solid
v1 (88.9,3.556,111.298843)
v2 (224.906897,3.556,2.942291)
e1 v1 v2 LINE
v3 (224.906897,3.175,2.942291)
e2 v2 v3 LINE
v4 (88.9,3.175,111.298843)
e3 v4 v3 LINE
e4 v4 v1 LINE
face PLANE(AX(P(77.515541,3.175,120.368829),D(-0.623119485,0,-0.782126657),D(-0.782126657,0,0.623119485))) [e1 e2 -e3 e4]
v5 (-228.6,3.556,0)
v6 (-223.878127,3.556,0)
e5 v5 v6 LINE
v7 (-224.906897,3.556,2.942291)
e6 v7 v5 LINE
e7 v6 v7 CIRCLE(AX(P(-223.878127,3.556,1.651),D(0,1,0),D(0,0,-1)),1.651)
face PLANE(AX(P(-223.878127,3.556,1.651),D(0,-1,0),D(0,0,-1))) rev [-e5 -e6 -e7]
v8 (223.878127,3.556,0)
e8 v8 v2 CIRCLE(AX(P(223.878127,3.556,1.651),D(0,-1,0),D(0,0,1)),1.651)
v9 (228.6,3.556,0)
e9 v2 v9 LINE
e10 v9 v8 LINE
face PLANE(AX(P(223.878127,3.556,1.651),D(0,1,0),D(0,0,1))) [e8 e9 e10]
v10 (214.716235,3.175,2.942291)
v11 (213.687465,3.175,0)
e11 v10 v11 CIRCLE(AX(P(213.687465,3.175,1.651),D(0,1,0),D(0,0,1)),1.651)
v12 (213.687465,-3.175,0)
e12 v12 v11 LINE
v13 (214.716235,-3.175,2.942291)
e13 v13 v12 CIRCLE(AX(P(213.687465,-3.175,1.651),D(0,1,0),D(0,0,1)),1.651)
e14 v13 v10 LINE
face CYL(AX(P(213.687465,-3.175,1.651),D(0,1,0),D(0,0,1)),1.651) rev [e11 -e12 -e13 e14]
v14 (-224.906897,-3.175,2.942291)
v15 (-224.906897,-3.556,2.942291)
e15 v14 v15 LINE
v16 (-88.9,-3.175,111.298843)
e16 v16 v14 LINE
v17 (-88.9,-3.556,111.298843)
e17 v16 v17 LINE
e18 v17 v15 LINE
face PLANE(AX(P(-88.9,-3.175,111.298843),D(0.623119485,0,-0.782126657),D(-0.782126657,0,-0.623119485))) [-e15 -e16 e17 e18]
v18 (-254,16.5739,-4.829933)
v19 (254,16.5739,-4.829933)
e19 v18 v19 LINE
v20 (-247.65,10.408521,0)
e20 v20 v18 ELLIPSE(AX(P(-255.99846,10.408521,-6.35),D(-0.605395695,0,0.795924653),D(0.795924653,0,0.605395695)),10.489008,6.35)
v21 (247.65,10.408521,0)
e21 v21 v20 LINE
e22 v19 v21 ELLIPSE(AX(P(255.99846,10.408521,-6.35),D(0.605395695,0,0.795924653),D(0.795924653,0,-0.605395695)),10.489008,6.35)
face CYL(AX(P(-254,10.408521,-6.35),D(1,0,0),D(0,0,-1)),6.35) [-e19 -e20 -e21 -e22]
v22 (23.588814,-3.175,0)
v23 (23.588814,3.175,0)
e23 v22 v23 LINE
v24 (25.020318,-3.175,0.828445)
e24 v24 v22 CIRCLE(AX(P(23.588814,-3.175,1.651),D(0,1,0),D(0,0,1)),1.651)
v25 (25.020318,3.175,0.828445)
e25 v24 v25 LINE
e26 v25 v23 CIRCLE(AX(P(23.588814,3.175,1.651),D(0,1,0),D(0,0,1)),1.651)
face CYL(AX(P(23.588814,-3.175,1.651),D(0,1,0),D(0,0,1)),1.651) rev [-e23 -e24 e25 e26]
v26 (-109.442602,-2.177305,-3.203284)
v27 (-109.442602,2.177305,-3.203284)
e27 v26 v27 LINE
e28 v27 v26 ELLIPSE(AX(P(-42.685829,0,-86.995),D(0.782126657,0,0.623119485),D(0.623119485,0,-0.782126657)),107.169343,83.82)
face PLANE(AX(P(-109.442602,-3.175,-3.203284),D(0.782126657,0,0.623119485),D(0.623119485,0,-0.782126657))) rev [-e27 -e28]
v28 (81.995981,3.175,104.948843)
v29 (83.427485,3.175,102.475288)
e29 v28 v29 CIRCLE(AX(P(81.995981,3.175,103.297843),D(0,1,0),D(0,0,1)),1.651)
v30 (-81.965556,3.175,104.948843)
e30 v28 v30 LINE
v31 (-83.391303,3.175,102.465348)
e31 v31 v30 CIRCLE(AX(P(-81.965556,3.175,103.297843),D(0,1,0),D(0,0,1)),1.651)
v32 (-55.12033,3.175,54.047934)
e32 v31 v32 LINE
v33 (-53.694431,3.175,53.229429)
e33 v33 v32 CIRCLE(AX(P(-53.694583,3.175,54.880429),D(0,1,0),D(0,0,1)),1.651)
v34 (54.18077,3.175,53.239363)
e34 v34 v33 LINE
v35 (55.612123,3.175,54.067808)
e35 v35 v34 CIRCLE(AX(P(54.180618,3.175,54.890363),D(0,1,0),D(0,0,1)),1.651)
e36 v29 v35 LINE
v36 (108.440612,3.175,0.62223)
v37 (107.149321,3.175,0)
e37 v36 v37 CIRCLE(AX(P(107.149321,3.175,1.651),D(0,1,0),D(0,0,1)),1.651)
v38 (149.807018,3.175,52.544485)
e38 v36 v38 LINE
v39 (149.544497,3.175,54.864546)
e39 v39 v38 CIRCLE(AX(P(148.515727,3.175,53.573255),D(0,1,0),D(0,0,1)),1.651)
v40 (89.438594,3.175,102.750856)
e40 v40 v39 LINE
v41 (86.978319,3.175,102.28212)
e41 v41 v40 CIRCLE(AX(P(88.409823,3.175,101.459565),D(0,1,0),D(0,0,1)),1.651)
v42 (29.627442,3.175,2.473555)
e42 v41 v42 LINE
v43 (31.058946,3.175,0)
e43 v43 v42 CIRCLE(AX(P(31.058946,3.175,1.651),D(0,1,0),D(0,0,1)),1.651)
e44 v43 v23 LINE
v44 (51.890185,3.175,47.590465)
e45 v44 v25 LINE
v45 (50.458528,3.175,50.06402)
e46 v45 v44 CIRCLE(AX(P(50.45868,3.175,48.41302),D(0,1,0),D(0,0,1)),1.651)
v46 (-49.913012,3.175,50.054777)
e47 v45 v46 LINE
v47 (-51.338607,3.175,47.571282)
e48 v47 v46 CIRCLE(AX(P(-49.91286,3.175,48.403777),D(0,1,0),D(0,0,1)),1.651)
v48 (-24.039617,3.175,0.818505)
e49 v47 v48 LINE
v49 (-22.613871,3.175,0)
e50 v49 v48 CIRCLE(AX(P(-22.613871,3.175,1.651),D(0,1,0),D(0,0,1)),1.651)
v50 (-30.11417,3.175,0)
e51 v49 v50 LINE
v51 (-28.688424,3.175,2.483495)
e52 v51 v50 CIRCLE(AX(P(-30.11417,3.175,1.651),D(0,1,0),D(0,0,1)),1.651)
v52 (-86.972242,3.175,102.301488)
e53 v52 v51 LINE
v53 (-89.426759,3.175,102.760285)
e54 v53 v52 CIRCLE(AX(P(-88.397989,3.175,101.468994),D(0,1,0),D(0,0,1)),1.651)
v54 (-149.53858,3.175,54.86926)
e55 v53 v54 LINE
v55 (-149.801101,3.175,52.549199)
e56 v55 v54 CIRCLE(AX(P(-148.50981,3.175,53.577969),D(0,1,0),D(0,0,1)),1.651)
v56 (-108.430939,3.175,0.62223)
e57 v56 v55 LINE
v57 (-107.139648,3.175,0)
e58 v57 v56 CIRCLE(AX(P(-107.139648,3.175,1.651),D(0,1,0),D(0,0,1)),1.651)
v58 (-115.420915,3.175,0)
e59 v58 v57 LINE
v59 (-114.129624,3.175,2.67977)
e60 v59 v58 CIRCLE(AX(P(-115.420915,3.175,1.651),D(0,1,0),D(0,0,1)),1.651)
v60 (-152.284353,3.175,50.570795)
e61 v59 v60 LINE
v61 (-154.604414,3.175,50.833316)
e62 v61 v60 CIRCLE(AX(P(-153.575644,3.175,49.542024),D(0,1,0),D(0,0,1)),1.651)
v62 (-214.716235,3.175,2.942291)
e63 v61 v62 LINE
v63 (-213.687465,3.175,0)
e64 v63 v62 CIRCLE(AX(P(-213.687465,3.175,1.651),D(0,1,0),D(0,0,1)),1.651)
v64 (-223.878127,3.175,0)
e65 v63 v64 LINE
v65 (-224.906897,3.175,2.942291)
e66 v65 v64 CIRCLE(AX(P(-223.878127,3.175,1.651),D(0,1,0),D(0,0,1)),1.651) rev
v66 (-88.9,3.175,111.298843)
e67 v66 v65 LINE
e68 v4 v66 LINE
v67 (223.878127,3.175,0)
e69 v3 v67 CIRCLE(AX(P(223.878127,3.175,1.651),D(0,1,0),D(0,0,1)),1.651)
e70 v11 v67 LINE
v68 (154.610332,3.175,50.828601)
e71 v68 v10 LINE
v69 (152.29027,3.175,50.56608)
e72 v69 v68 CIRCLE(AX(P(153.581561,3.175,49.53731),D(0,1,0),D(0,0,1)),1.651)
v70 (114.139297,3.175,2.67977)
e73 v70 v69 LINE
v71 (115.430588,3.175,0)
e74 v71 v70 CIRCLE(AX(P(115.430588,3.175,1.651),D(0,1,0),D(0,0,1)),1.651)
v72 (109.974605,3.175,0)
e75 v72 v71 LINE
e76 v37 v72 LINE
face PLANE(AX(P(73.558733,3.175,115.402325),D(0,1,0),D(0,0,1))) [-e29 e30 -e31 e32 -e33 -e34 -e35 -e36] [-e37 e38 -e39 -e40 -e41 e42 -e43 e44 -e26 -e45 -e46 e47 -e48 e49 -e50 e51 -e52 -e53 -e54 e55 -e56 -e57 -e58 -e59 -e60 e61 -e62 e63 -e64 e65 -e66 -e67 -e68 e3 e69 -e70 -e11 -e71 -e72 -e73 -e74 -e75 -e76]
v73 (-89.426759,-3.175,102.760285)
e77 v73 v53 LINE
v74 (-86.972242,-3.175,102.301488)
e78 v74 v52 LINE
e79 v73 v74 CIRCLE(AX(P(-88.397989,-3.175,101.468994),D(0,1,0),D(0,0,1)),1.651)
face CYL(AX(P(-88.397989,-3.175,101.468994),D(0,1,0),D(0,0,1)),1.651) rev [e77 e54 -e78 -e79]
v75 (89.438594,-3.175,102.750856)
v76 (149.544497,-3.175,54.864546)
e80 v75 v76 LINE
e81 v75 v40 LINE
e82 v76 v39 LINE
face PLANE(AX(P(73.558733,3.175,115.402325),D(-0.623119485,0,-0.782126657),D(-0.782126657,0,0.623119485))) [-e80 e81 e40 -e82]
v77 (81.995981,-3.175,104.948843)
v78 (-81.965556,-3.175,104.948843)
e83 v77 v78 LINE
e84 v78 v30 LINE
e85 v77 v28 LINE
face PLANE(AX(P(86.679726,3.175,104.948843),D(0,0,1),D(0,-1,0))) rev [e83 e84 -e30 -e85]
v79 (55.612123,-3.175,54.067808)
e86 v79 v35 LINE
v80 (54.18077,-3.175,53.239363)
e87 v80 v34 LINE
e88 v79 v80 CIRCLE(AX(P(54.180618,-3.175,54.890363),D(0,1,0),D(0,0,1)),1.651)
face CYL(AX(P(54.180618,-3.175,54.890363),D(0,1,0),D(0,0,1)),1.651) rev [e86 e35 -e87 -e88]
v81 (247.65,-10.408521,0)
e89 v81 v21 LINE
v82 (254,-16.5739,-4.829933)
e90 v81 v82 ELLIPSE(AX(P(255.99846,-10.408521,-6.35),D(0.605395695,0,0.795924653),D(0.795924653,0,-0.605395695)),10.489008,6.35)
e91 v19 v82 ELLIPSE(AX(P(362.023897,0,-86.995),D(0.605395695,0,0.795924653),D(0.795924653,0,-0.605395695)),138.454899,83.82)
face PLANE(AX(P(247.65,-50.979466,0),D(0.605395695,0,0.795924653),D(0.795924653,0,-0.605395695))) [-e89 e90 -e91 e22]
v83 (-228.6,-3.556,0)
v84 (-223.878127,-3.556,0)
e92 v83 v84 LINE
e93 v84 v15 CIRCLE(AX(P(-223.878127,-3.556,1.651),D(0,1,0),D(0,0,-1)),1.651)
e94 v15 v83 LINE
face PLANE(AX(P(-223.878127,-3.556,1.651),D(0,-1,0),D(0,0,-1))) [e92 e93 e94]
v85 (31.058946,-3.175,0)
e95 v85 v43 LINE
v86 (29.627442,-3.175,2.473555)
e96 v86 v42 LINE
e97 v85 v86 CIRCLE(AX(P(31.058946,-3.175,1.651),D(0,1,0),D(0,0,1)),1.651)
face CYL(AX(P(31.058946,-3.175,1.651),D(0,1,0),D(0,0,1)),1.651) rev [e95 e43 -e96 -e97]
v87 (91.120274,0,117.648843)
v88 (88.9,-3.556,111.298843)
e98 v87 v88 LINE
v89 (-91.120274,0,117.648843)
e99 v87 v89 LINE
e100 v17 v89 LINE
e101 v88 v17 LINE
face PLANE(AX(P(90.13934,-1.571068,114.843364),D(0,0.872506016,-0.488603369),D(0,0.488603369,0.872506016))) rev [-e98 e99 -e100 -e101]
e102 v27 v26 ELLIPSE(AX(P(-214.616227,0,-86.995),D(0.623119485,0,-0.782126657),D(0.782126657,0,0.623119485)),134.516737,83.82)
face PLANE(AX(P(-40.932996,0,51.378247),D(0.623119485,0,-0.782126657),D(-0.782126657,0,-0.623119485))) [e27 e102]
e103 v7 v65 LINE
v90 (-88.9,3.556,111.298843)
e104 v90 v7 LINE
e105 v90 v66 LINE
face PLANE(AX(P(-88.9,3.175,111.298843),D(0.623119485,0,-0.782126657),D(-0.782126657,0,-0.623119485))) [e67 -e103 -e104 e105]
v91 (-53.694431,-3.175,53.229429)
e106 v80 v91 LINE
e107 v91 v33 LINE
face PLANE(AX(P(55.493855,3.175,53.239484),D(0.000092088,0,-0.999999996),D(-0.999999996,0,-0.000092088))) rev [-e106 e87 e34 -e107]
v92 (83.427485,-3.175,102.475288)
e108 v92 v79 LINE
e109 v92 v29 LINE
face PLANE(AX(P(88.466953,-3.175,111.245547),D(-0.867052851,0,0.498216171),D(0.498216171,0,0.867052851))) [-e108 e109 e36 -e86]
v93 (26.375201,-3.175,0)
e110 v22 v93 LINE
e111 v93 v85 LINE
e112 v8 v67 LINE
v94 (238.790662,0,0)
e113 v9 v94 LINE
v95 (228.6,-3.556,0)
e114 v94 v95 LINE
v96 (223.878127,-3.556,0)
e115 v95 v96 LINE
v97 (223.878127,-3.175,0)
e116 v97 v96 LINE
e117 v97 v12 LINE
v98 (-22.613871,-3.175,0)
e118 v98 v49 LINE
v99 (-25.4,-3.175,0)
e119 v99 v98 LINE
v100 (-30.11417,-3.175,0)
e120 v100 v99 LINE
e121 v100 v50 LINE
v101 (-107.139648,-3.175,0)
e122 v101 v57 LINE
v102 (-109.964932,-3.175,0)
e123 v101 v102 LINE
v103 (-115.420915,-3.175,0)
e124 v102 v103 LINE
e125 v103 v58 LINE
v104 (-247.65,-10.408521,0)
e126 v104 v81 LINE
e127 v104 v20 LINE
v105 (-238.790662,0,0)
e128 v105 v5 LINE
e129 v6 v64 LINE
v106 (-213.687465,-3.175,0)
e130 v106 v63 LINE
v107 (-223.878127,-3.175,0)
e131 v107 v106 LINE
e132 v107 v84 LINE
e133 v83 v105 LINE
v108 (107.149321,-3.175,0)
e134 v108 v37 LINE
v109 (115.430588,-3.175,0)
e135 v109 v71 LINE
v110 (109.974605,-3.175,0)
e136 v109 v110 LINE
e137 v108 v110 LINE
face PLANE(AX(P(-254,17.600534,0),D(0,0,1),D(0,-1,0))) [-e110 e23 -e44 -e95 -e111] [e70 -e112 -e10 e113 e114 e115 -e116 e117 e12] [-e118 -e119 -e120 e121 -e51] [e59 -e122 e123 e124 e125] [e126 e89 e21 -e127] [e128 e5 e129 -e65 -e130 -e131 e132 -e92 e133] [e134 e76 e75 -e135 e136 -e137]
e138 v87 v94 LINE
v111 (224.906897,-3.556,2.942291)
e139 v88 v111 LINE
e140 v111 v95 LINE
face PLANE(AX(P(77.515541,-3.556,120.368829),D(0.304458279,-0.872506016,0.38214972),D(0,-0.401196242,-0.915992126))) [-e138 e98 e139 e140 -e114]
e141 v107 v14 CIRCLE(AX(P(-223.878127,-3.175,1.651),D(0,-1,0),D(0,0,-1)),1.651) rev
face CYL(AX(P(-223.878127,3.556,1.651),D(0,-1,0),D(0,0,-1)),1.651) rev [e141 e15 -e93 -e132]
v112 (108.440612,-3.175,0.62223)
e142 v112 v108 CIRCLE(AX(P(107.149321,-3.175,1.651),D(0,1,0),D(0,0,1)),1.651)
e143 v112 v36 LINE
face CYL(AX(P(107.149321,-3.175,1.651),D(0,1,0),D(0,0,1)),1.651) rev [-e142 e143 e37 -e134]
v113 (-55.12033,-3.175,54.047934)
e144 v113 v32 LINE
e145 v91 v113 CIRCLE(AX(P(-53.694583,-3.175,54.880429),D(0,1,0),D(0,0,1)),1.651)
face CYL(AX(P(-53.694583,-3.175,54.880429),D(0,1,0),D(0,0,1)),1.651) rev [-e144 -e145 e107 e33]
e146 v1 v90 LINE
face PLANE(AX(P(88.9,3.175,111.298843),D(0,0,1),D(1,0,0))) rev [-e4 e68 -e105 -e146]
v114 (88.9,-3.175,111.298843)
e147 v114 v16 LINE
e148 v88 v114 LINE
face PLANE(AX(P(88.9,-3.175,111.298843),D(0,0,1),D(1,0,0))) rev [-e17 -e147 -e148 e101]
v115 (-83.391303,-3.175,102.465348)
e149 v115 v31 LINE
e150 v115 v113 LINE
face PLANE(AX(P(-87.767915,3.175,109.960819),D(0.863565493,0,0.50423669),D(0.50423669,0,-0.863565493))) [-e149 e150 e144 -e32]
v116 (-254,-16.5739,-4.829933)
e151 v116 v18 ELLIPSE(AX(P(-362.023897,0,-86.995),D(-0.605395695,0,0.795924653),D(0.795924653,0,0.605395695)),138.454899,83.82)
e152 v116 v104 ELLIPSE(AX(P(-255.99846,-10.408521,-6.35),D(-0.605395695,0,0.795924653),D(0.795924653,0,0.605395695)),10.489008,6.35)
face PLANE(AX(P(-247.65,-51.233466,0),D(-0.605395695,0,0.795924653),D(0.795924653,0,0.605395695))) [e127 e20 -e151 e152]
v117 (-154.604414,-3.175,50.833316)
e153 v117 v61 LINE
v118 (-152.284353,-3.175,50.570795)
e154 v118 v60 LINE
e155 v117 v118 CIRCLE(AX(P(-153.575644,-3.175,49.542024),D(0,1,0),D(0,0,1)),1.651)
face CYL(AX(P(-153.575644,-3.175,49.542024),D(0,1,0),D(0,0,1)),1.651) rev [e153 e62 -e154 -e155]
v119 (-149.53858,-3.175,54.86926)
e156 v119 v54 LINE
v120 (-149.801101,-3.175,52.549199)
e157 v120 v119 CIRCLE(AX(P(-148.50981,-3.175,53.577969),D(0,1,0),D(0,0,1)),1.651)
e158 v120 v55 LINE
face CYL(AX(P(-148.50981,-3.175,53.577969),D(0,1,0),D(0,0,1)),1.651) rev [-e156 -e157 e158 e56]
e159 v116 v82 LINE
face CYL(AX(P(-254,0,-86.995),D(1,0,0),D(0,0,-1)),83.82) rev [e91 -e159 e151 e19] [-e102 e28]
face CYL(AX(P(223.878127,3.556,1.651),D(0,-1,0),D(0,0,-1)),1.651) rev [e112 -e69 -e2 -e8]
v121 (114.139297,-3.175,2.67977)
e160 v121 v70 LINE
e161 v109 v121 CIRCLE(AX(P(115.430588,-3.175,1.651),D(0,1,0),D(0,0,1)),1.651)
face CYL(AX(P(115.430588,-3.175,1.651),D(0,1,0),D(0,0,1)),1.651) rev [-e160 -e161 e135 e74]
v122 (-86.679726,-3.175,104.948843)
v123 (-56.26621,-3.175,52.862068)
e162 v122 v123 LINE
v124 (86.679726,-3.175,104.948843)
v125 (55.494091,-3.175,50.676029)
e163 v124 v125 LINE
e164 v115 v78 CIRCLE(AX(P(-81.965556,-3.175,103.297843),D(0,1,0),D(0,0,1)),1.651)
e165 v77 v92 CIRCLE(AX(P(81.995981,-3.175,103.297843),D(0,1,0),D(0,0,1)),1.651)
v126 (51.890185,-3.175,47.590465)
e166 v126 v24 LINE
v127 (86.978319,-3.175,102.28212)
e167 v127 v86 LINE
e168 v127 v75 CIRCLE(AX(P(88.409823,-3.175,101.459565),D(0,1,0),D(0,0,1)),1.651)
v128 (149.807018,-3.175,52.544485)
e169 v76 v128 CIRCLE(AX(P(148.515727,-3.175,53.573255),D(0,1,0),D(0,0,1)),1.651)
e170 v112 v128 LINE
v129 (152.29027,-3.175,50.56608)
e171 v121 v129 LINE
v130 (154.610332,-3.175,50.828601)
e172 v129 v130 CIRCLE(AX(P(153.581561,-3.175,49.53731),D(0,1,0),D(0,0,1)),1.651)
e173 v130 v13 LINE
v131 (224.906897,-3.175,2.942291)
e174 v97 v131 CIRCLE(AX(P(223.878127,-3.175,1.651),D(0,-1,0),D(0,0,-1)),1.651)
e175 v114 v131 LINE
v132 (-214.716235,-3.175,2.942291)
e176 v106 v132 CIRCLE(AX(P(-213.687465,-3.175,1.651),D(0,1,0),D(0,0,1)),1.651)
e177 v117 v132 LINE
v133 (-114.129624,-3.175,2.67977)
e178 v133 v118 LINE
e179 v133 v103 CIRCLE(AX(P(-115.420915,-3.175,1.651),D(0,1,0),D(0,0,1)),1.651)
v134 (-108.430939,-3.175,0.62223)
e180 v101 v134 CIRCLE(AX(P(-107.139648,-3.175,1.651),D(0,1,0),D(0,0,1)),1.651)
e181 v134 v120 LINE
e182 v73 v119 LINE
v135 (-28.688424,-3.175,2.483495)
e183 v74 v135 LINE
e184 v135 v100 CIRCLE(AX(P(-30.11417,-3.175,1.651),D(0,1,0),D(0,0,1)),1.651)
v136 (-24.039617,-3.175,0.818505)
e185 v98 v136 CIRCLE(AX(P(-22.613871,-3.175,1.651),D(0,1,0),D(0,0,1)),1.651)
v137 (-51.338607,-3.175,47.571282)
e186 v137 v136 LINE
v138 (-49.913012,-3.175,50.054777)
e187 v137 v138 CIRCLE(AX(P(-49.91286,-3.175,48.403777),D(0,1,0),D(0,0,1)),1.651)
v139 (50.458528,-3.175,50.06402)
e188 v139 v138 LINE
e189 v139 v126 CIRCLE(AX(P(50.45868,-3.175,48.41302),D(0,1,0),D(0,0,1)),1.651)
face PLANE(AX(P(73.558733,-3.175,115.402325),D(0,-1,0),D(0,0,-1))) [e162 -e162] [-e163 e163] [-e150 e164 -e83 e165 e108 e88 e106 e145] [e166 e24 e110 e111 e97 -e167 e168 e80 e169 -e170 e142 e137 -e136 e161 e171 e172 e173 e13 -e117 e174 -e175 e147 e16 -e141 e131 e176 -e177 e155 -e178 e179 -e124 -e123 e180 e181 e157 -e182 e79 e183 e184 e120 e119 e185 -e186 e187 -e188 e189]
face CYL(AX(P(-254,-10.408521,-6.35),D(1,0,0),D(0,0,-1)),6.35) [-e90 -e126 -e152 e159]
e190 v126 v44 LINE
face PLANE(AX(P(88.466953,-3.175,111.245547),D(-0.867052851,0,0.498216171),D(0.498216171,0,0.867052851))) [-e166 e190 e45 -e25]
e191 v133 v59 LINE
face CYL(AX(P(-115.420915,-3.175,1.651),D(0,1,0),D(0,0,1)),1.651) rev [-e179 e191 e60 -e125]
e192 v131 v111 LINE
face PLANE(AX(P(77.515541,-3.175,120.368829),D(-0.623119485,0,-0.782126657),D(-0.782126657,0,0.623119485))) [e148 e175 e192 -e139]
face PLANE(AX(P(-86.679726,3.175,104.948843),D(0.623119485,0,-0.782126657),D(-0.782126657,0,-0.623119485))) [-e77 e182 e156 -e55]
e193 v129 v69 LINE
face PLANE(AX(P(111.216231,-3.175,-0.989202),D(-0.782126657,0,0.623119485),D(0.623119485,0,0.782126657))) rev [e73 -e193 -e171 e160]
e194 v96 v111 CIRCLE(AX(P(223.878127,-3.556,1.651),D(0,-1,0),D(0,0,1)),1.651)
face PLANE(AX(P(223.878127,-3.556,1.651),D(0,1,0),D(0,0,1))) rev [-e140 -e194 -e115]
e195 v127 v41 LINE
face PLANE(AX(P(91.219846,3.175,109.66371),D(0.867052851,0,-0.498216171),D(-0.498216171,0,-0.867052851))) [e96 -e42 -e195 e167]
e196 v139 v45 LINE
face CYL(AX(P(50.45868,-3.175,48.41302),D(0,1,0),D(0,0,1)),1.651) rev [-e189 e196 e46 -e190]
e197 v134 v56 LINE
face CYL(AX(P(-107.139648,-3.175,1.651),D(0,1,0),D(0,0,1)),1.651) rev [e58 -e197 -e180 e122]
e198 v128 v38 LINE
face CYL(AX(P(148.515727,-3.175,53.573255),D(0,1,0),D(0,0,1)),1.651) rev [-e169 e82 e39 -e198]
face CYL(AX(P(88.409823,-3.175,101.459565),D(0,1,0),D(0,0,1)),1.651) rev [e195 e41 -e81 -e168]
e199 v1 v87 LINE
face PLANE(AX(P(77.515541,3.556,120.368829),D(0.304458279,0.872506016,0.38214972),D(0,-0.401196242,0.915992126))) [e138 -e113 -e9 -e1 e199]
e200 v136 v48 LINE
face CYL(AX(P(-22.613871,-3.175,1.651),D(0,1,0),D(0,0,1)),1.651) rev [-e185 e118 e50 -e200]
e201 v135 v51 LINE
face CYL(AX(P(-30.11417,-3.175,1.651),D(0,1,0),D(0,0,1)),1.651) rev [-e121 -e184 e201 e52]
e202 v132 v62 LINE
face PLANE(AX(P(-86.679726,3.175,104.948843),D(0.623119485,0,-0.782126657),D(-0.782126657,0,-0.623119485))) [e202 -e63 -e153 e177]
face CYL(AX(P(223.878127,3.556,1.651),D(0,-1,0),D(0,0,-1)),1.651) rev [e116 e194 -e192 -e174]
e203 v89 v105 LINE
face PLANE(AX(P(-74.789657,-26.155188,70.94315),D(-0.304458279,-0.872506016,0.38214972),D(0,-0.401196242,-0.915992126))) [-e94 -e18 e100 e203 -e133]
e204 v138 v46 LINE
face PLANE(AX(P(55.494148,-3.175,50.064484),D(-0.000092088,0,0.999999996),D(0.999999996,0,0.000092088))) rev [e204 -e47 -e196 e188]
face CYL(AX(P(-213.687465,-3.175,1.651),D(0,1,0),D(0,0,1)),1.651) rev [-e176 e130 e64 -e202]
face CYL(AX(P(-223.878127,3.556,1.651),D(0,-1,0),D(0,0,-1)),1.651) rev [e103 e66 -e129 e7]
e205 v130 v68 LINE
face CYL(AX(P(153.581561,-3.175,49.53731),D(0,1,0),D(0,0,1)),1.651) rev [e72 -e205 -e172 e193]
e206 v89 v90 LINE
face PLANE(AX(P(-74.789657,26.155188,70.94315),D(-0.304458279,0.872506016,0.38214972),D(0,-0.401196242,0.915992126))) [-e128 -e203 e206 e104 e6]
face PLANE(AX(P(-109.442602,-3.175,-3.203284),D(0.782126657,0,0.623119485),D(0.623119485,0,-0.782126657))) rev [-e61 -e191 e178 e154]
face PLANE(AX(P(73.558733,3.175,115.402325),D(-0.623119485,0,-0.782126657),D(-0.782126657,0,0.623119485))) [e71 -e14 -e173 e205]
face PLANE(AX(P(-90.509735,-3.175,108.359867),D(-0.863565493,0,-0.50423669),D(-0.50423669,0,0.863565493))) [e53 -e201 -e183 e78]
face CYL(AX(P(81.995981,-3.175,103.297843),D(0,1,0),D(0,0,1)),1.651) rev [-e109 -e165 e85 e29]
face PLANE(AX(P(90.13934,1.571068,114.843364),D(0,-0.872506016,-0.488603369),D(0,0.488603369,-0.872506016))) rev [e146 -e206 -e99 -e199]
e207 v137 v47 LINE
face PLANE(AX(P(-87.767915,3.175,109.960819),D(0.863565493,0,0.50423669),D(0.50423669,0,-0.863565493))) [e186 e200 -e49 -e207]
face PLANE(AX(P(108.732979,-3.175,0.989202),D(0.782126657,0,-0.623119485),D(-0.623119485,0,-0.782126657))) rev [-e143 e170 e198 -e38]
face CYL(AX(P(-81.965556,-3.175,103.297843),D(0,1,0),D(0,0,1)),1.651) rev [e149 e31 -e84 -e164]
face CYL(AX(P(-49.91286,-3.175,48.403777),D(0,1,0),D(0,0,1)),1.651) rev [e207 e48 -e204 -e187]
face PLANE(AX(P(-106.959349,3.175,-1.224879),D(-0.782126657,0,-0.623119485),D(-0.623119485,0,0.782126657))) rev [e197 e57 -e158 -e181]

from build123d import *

# Parameters (mm, degrees)
BOSS_EXTRUDE3_DEPTH      = 254
BOSS_EXTRUDE3_DEPTH_BACK = 254
CUT_EXTRUDE1_START       = -508
CUT_EXTRUDE1_DEPTH       = 508
CUT_EXTRUDE2_DEPTH       = 68.58
CUT_EXTRUDE3_DEPTH       = 68.834
BOSS_EXTRUDE4_DEPTH      = 0.381
BOSS_EXTRUDE4_DEPTH_BACK = 6.731
BOSS_EXTRUDE5_DEPTH      = 0.381
BOSS_EXTRUDE5_DEPTH_BACK = 6.731
BOSS_EXTRUDE6_DEPTH      = 6.35
BOSS_EXTRUDE7_DEPTH      = 1.2701
BOSS_EXTRUDE7_DEPTH_BACK = 110.49
BOSS_EXTRUDE9_DEPTH      = 6.35
FILLET1_R                = 6.35


with BuildPart() as part:
    # Sweep2: sweep along a path in CS path
    with BuildLine(Plane(origin=(0, 0, 0), x_dir=(1, 0, 0), z_dir=(0, 1, 0))) as sweep2_path:
        Line((248.466017094, 15.827234907), (88.9, -111.298842947))
        Line((88.9, -111.298842947), (-88.9, -111.298842947))
        Line((-88.9, -111.298842947), (-248.466017094, 15.827234907))
    # Sketch7 → Sweep2 (sweep)
    with BuildSketch(Plane(origin=(248.466017094, 0, -15.827234907), x_dir=(-0.6231194845416403, 0, -0.7821266572522385), z_dir=(0.7821266572522386, 0, -0.6231194845416403))):
        Polygon((0, 3.175), (0, 3.556), (-6.35, 0), (0, -3.556), (0, -3.175), (6.35, -3.175), (6.35, 3.175), align=None)
    sweep(path=sweep2_path.line, transition=Transition.RIGHT)



with BuildPart() as body_2:
    # Sketch8 → Boss-Extrude3 (new, two sides: drawn at the far end of the back side and taken through both)
    with BuildSketch(Plane(origin=(0, 0, 0), x_dir=(0, 0, -1), z_dir=(1, 0, 0)).offset(-BOSS_EXTRUDE3_DEPTH_BACK)):
        with BuildLine():
            Line((4.829932897, 16.573899603), (0, 17.600533533))
            Line((0, 17.600533533), (0, -17.600533533))
            Line((0, -17.600533533), (4.829932897, -16.573899603))
            ThreePointArc((4.829932897, -16.573899603), (3.175, 0), (4.829932897, 16.573899603))
        make_face()
    extrude(amount=BOSS_EXTRUDE3_DEPTH + BOSS_EXTRUDE3_DEPTH_BACK)


with BuildPart() as part_1:
    add(part.part)

    add(body_2.part)  # Sweep3 merges body 2
    # Sweep3: sweep along a path in Sketch11
    with BuildLine(Plane(origin=(0, 0, 0), x_dir=(1, 0, 0), z_dir=(0, 1, 0))) as sweep3_path:
        Line((-89.138825221, -109.160343039), (-15.091285359, 17.654903783))
    # Sketch12 → Sweep3 (sweep)
    with BuildSketch(Plane(origin=(-15.091285359, 0, -17.654903783), x_dir=(-0.8635654930080803, 0, -0.5042366897457098), z_dir=(0.5042366897457098, 0, -0.8635654930080803))):
        Polygon((0, -3.175), (1.5875, -3.175), (1.5875, 3.175), (-1.5875, 3.175), (-1.5875, -3.175), align=None)
    sweep(path=sweep3_path.line)

    # Sweep5: sweep along a path in Sketch13
    with BuildLine(Plane(origin=(0, 0, 0), x_dir=(1, 0, 0), z_dir=(0, 1, 0))) as sweep5_path:
        Line((89.843399112, -110.454628552), (12.634277531, 23.91352897))
    # Sketch14 → Sweep5 (sweep)
    with BuildSketch(Plane(origin=(12.634277531, 0, -23.91352897), x_dir=(-0.8670528510827185, 0, 0.49821617138480095), z_dir=(-0.498216171384801, 0, -0.8670528510827186))):
        Polygon((0, -3.175), (1.5875, -3.175), (1.5875, 3.175), (-1.5875, 3.175), (-1.5875, -3.175), align=None)
    sweep(path=sweep5_path.line)

    # Sketch15 → Cut-Extrude1 (cut)
    with BuildSketch(Plane(origin=(254, 0, 0), x_dir=(0, 0, -1), z_dir=(1, 0, 0)).offset(CUT_EXTRUDE1_START)):
        with BuildLine():
            Line((4.829932897, -16.573899603), (30.949901181, -16.573899603))
            Line((30.949901181, -16.573899603), (30.949901181, 16.573899603))
            Line((30.949901181, 16.573899603), (4.829932897, 16.573899603))
            ThreePointArc((4.829932897, 16.573899603), (3.175, 0), (4.829932897, -16.573899603))
        make_face()
    extrude(amount=CUT_EXTRUDE1_DEPTH, mode=Mode.SUBTRACT)

    # Sketch17 → Cut-Extrude2 (cut)
    with BuildSketch(Plane.XZ.offset(-17.600533533)):
        Polygon((254, 0), (247.65, 0), (254, -4.829932897), align=None)
    extrude(amount=CUT_EXTRUDE2_DEPTH, mode=Mode.SUBTRACT)

    # Sketch18 → Cut-Extrude3 (cut)
    with BuildSketch(Plane.XZ.offset(-17.600533533)):
        Polygon((-254, 0), (-247.65, 0), (-254, -4.829932897), align=None)
    extrude(amount=CUT_EXTRUDE3_DEPTH, mode=Mode.SUBTRACT)

    # Sketch19 → Boss-Extrude4 (add, two sides: drawn at the far end of the back side and taken through both)
    with BuildSketch(Plane(origin=(0, 3.175, 0), x_dir=(1, 0, 0), z_dir=(0, 1, 0)).offset(-BOSS_EXTRUDE4_DEPTH_BACK)):
        with BuildLine():
            Line((223.878126934, 0), (228.6, 0))
            Line((228.6, 0), (224.906897203, -2.942291111))
            ThreePointArc((224.906897203, -2.942291111), (225.436607383, -1.106078274), (223.878126934, 0))
        make_face()
    extrude(amount=BOSS_EXTRUDE4_DEPTH + BOSS_EXTRUDE4_DEPTH_BACK)

    # Sketch20 → Boss-Extrude5 (add, two sides: drawn at the far end of the back side and taken through both)
    with BuildSketch(Plane.XZ.offset(3.175).offset(-BOSS_EXTRUDE5_DEPTH_BACK)):
        with BuildLine():
            Line((-224.906897203, 2.942291111), (-228.6, 0))
            Line((-228.6, 0), (-223.878126934, 0))
            ThreePointArc((-223.878126934, 0), (-225.436607383, 1.106078274), (-224.906897203, 2.942291111))
        make_face()
    extrude(amount=BOSS_EXTRUDE5_DEPTH + BOSS_EXTRUDE5_DEPTH_BACK)

    # Sketch21 → Boss-Extrude6 (add)
    with BuildSketch(Plane(origin=(0, 3.175, 0), x_dir=(1, 0, 0), z_dir=(0, 1, 0))):
        with BuildLine():
            Line((-89.426759305, -102.760284742), (-87.934379177, -103.949262419))
            Line((-87.934379177, -103.949262419), (-86.972242407, -102.301488406))
            ThreePointArc((-86.972242407, -102.301488406), (-88.094639276, -103.091886087), (-89.426759305, -102.760284742))
        make_face()
        with BuildLine():
            ThreePointArc((-81.965556152, -104.948842947), (-83.397381887, -104.11983812), (-83.391302781, -102.465348173))
            Line((-83.391302781, -102.465348173), (-84.841417676, -104.948842947))
            Line((-84.841417676, -104.948842947), (-81.965556152, -104.948842947))
        make_face()
        with BuildLine():
            Line((-218.409338084, 0), (-214.716235287, -2.942291111))
            ThreePointArc((-214.716235287, -2.942291111), (-215.245945468, -1.106078274), (-213.687465018, 0))
            Line((-213.687465018, 0), (-218.409338084, 0))
        make_face()
        with BuildLine():
            ThreePointArc((-30.114170272, 0), (-28.682344536, -0.829004828), (-28.688423643, -2.483494775))
            Line((-28.688423643, -2.483494775), (-27.238308748, 0))
            Line((-27.238308748, 0), (-30.114170272, 0))
        make_face()
        with BuildLine():
            Line((-22.613870581, 0), (-23.561691252, 0))
            Line((-23.561691252, 0), (-24.03961721, -0.818505225))
            ThreePointArc((-24.03961721, -0.818505225), (-23.435865753, -0.219174265), (-22.613870581, 0))
        make_face()
        with BuildLine():
            Line((31.058946485, 0), (28.206115892, 0))
            Line((28.206115892, 0), (29.627442228, -2.473554899))
            ThreePointArc((29.627442228, -2.473554899), (29.629988973, -0.824028761), (31.058946485, 0))
        make_face()
        with BuildLine():
            Line((24.544286055, 0), (23.588813618, 0))
            ThreePointArc((23.588813618, 0), (24.415784857, -0.222042489), (25.020317875, -0.828445101))
            Line((25.020317875, -0.828445101), (24.544286055, 0))
        make_face()
        with BuildLine():
            Line((84.848811505, -104.948842947), (83.42748517, -102.475288048))
            ThreePointArc((83.42748517, -102.475288048), (83.424938424, -104.124814187), (81.995980913, -104.948842947))
            Line((81.995980913, -104.948842947), (84.848811505, -104.948842947))
        make_face()
        with BuildLine():
            ThreePointArc((213.687465018, 0), (215.245945468, -1.106078274), (214.716235287, -2.942291111))
            Line((214.716235287, -2.942291111), (218.409338084, 0))
            Line((218.409338084, 0), (213.687465018, 0))
        make_face()
        with BuildLine():
            ThreePointArc((86.978319053, -102.282120176), (88.100829661, -103.081392618), (89.438593579, -102.750856388))
            Line((89.438593579, -102.750856388), (87.935678698, -103.948227093))
            Line((87.935678698, -103.948227093), (86.978319053, -102.282120176))
        make_face()
    extrude(amount=-BOSS_EXTRUDE6_DEPTH)

    # Sweep6: sweep along a path in Sketch22
    with BuildLine(Plane(origin=(0, 3.175, 0), x_dir=(1, 0, 0), z_dir=(0, 1, 0))) as sweep6_path:
        Line((-152.071497255, -52.85128796), (-108.200975455, 2.214081393))
    # Sketch23 → Sweep6 (sweep)
    with BuildSketch(Plane(origin=(-152.071497255, 3.175, 52.85128796), x_dir=(-0.7821266572522384, 0, -0.6231194845416403), z_dir=(0.6231194845416403, 0, -0.7821266572522384))):
        Polygon((0, -6.35), (1.5875, -6.35), (1.5875, 0), (-1.5875, 0), (-1.5875, -6.35), align=None)
    sweep(path=sweep6_path.line)

    # Sweep7: sweep along a path in Sketch24
    with BuildLine(Plane(origin=(0, 3.175, 0), x_dir=(1, 0, 0), z_dir=(0, 1, 0))) as sweep7_path:
        Line((152.077414419, -52.846573761), (109.974604732, 0))
    # Sketch25 → Sweep7 (sweep)
    with BuildSketch(Plane(origin=(152.077414419, 3.175, 52.846573761), x_dir=(-0.7821266572522393, 0, 0.6231194845416392), z_dir=(-0.6231194845416392, 0, -0.7821266572522393))):
        Polygon((1.5875, 0), (0, 0), (-1.5875, 0), (-1.5875, -6.35), (0, -6.35), (1.5875, -6.35), align=None)
    sweep(path=sweep7_path.line)

    # Sketch27 → Boss-Extrude7 (add, two sides: drawn at the far end of the back side and taken through both)
    with BuildSketch(Plane(origin=(54.223901551, 3.175, 51.651866625), x_dir=(9.208844186523149e-05, 0, -0.9999999957598595), z_dir=(0.9999999957598595, 0, 9.208844186523149e-05)).offset(-BOSS_EXTRUDE7_DEPTH_BACK)):
        Polygon((0, -6.35), (1.5875, -6.35), (1.5875, 0), (-1.5875, 0), (-1.5875, -6.35), align=None)
    extrude(amount=BOSS_EXTRUDE7_DEPTH + BOSS_EXTRUDE7_DEPTH_BACK)

    # Sketch28 → Boss-Extrude9 (add)
    with BuildSketch(Plane(origin=(0, 3.175, 0), x_dir=(1, 0, 0), z_dir=(0, 1, 0))):
        with BuildLine():
            ThreePointArc((107.149320987, 0), (107.866015234, -0.163670058), (108.440612098, -0.622229731))
            Line((108.440612098, -0.622229731), (107.944882327, 0))
            Line((107.944882327, 0), (107.149320987, 0))
        make_face()
        Polygon((108.440612098, -0.622229731), (108.732978664, -0.989202182), (109.974604732, 0), (107.944882327, 0), align=None)
        with BuildLine():
            Line((112.004327137, 0), (114.13929729, -2.679770269))
            ThreePointArc((114.13929729, -2.679770269), (113.943258459, -0.934305754), (115.430588401, 0))
            Line((115.430588401, 0), (112.004327137, 0))
        make_face()
        with BuildLine():
            Line((152.290270219, -50.566080468), (153.319040488, -51.857371579))
            Line((153.319040488, -51.857371579), (154.610331599, -50.82860131))
            ThreePointArc((154.610331599, -50.82860131), (153.395931062, -51.177841334), (152.290270219, -50.566080468))
        make_face()
        with BuildLine():
            Line((150.835788351, -53.835775943), (149.807018082, -52.544484832))
            ThreePointArc((149.807018082, -52.544484832), (150.156258105, -53.758885368), (149.54449724, -54.864546212))
            Line((149.54449724, -54.864546212), (150.835788351, -53.835775943))
        make_face()
        with BuildLine():
            ThreePointArc((51.890184551, -47.590464979), (51.887599727, -49.240056912), (50.458528256, -50.064019871))
            Line((50.458528256, -50.064019871), (53.311661856, -50.064282612))
            Line((53.311661856, -50.064282612), (51.890184551, -47.590464979))
        make_face()
        with BuildLine():
            Line((55.136141247, -53.239450638), (54.18077029, -53.23936266))
            ThreePointArc((54.18077029, -53.23936266), (55.007655286, -53.46144322), (55.612122509, -54.067807754))
            Line((55.612122509, -54.067807754), (55.136141247, -53.239450638))
        make_face()
        with BuildLine():
            Line((-51.338606818, -47.571282044), (-52.788567089, -50.054512007))
            Line((-52.788567089, -50.054512007), (-49.913012227, -50.054776812))
            ThreePointArc((-49.913012227, -50.054776812), (-51.344723771, -49.225706063), (-51.338606818, -47.571282044))
        make_face()
        with BuildLine():
            Line((-54.642352853, -53.229341308), (-55.120329777, -54.047933819))
            ThreePointArc((-55.120329777, -54.047933819), (-54.516512392, -53.448565012), (-53.69443111, -53.229428601))
            Line((-53.69443111, -53.229428601), (-54.642352853, -53.229341308))
        make_face()
        with BuildLine():
            ThreePointArc((-115.420915439, 0), (-113.933585497, -0.934305754), (-114.129624328, -2.679770269))
            Line((-114.129624328, -2.679770269), (-111.994654175, 0))
            Line((-111.994654175, 0), (-115.420915439, 0))
        make_face()
        with BuildLine():
            Line((-107.139648025, 0), (-107.935209365, 0))
            Line((-107.935209365, 0), (-108.430939137, -0.622229731))
            ThreePointArc((-108.430939137, -0.622229731), (-107.856342272, -0.163670058), (-107.139648025, 0))
        make_face()
        with BuildLine():
            ThreePointArc((-149.538580075, -54.86926041), (-150.150340941, -53.763599567), (-149.801100917, -52.54919903))
            Line((-149.801100917, -52.54919903), (-150.829871186, -53.840490141))
            Line((-150.829871186, -53.840490141), (-149.538580075, -54.86926041))
        make_face()
        with BuildLine():
            Line((-154.604414434, -50.833315509), (-153.313123323, -51.862085778))
            Line((-153.313123323, -51.862085778), (-152.284353054, -50.570794667))
            ThreePointArc((-152.284353054, -50.570794667), (-153.390013898, -51.182555533), (-154.604414434, -50.833315509))
        make_face()
    extrude(amount=-BOSS_EXTRUDE9_DEPTH)

    # Fillet1
    # the kernel refuses this fillet: 6.35 mm, written as the material it takes off along each edge
    with BuildSketch(Plane(origin=(-265.630031876, -17.600533533, 0), x_dir=(0, 1, 0), z_dir=(1, 0, 0))) as fillet1_piece_1:
        with BuildLine():
            CenterArc((7.192012751, -6.35), FILLET1_R, 90, 76.150011514)
            Line((1.02663393, -4.829932897), (0.903326353, -4.799531555))
            ThreePointArc((0.903326353, -4.799531555), (0.38909222, -2.441371233), (-0.124224745, -0.026404785))
            Line((-0.124224745, -0.026404785), (0, 0.127))
            Line((0, 0.127), (7.192012751, 0.127))
            Line((7.192012751, 0.127), (7.192012751, 0))
        make_face()
    extrude(amount=531.260063753, mode=Mode.SUBTRACT)
    with BuildSketch(Plane(origin=(-265.630031876, 17.600533533, 0), x_dir=(0, -0.2079116908183426, -0.9781476007336817), z_dir=(1, 0, 0))) as fillet1_piece_2:
        with BuildLine():
            CenterArc((7.706540796, -5.71461078), FILLET1_R, 115.849988486, 76.150011514)
            Line((1.495303531, -7.034850016), (1.371078786, -7.061254801))
            Line((1.371078786, -7.061254801), (-0.124224745, -0.026404785))
            Line((-0.124224745, -0.026404785), (0, 0.127))
            ThreePointArc((0, 0.127), (2.468918236, 0.127), (4.882462385, 0.114292216))
            Line((4.882462385, 0.114292216), (4.937836472, 0))
        make_face()
    extrude(amount=531.260063753, mode=Mode.SUBTRACT)


solid = part_1.part
